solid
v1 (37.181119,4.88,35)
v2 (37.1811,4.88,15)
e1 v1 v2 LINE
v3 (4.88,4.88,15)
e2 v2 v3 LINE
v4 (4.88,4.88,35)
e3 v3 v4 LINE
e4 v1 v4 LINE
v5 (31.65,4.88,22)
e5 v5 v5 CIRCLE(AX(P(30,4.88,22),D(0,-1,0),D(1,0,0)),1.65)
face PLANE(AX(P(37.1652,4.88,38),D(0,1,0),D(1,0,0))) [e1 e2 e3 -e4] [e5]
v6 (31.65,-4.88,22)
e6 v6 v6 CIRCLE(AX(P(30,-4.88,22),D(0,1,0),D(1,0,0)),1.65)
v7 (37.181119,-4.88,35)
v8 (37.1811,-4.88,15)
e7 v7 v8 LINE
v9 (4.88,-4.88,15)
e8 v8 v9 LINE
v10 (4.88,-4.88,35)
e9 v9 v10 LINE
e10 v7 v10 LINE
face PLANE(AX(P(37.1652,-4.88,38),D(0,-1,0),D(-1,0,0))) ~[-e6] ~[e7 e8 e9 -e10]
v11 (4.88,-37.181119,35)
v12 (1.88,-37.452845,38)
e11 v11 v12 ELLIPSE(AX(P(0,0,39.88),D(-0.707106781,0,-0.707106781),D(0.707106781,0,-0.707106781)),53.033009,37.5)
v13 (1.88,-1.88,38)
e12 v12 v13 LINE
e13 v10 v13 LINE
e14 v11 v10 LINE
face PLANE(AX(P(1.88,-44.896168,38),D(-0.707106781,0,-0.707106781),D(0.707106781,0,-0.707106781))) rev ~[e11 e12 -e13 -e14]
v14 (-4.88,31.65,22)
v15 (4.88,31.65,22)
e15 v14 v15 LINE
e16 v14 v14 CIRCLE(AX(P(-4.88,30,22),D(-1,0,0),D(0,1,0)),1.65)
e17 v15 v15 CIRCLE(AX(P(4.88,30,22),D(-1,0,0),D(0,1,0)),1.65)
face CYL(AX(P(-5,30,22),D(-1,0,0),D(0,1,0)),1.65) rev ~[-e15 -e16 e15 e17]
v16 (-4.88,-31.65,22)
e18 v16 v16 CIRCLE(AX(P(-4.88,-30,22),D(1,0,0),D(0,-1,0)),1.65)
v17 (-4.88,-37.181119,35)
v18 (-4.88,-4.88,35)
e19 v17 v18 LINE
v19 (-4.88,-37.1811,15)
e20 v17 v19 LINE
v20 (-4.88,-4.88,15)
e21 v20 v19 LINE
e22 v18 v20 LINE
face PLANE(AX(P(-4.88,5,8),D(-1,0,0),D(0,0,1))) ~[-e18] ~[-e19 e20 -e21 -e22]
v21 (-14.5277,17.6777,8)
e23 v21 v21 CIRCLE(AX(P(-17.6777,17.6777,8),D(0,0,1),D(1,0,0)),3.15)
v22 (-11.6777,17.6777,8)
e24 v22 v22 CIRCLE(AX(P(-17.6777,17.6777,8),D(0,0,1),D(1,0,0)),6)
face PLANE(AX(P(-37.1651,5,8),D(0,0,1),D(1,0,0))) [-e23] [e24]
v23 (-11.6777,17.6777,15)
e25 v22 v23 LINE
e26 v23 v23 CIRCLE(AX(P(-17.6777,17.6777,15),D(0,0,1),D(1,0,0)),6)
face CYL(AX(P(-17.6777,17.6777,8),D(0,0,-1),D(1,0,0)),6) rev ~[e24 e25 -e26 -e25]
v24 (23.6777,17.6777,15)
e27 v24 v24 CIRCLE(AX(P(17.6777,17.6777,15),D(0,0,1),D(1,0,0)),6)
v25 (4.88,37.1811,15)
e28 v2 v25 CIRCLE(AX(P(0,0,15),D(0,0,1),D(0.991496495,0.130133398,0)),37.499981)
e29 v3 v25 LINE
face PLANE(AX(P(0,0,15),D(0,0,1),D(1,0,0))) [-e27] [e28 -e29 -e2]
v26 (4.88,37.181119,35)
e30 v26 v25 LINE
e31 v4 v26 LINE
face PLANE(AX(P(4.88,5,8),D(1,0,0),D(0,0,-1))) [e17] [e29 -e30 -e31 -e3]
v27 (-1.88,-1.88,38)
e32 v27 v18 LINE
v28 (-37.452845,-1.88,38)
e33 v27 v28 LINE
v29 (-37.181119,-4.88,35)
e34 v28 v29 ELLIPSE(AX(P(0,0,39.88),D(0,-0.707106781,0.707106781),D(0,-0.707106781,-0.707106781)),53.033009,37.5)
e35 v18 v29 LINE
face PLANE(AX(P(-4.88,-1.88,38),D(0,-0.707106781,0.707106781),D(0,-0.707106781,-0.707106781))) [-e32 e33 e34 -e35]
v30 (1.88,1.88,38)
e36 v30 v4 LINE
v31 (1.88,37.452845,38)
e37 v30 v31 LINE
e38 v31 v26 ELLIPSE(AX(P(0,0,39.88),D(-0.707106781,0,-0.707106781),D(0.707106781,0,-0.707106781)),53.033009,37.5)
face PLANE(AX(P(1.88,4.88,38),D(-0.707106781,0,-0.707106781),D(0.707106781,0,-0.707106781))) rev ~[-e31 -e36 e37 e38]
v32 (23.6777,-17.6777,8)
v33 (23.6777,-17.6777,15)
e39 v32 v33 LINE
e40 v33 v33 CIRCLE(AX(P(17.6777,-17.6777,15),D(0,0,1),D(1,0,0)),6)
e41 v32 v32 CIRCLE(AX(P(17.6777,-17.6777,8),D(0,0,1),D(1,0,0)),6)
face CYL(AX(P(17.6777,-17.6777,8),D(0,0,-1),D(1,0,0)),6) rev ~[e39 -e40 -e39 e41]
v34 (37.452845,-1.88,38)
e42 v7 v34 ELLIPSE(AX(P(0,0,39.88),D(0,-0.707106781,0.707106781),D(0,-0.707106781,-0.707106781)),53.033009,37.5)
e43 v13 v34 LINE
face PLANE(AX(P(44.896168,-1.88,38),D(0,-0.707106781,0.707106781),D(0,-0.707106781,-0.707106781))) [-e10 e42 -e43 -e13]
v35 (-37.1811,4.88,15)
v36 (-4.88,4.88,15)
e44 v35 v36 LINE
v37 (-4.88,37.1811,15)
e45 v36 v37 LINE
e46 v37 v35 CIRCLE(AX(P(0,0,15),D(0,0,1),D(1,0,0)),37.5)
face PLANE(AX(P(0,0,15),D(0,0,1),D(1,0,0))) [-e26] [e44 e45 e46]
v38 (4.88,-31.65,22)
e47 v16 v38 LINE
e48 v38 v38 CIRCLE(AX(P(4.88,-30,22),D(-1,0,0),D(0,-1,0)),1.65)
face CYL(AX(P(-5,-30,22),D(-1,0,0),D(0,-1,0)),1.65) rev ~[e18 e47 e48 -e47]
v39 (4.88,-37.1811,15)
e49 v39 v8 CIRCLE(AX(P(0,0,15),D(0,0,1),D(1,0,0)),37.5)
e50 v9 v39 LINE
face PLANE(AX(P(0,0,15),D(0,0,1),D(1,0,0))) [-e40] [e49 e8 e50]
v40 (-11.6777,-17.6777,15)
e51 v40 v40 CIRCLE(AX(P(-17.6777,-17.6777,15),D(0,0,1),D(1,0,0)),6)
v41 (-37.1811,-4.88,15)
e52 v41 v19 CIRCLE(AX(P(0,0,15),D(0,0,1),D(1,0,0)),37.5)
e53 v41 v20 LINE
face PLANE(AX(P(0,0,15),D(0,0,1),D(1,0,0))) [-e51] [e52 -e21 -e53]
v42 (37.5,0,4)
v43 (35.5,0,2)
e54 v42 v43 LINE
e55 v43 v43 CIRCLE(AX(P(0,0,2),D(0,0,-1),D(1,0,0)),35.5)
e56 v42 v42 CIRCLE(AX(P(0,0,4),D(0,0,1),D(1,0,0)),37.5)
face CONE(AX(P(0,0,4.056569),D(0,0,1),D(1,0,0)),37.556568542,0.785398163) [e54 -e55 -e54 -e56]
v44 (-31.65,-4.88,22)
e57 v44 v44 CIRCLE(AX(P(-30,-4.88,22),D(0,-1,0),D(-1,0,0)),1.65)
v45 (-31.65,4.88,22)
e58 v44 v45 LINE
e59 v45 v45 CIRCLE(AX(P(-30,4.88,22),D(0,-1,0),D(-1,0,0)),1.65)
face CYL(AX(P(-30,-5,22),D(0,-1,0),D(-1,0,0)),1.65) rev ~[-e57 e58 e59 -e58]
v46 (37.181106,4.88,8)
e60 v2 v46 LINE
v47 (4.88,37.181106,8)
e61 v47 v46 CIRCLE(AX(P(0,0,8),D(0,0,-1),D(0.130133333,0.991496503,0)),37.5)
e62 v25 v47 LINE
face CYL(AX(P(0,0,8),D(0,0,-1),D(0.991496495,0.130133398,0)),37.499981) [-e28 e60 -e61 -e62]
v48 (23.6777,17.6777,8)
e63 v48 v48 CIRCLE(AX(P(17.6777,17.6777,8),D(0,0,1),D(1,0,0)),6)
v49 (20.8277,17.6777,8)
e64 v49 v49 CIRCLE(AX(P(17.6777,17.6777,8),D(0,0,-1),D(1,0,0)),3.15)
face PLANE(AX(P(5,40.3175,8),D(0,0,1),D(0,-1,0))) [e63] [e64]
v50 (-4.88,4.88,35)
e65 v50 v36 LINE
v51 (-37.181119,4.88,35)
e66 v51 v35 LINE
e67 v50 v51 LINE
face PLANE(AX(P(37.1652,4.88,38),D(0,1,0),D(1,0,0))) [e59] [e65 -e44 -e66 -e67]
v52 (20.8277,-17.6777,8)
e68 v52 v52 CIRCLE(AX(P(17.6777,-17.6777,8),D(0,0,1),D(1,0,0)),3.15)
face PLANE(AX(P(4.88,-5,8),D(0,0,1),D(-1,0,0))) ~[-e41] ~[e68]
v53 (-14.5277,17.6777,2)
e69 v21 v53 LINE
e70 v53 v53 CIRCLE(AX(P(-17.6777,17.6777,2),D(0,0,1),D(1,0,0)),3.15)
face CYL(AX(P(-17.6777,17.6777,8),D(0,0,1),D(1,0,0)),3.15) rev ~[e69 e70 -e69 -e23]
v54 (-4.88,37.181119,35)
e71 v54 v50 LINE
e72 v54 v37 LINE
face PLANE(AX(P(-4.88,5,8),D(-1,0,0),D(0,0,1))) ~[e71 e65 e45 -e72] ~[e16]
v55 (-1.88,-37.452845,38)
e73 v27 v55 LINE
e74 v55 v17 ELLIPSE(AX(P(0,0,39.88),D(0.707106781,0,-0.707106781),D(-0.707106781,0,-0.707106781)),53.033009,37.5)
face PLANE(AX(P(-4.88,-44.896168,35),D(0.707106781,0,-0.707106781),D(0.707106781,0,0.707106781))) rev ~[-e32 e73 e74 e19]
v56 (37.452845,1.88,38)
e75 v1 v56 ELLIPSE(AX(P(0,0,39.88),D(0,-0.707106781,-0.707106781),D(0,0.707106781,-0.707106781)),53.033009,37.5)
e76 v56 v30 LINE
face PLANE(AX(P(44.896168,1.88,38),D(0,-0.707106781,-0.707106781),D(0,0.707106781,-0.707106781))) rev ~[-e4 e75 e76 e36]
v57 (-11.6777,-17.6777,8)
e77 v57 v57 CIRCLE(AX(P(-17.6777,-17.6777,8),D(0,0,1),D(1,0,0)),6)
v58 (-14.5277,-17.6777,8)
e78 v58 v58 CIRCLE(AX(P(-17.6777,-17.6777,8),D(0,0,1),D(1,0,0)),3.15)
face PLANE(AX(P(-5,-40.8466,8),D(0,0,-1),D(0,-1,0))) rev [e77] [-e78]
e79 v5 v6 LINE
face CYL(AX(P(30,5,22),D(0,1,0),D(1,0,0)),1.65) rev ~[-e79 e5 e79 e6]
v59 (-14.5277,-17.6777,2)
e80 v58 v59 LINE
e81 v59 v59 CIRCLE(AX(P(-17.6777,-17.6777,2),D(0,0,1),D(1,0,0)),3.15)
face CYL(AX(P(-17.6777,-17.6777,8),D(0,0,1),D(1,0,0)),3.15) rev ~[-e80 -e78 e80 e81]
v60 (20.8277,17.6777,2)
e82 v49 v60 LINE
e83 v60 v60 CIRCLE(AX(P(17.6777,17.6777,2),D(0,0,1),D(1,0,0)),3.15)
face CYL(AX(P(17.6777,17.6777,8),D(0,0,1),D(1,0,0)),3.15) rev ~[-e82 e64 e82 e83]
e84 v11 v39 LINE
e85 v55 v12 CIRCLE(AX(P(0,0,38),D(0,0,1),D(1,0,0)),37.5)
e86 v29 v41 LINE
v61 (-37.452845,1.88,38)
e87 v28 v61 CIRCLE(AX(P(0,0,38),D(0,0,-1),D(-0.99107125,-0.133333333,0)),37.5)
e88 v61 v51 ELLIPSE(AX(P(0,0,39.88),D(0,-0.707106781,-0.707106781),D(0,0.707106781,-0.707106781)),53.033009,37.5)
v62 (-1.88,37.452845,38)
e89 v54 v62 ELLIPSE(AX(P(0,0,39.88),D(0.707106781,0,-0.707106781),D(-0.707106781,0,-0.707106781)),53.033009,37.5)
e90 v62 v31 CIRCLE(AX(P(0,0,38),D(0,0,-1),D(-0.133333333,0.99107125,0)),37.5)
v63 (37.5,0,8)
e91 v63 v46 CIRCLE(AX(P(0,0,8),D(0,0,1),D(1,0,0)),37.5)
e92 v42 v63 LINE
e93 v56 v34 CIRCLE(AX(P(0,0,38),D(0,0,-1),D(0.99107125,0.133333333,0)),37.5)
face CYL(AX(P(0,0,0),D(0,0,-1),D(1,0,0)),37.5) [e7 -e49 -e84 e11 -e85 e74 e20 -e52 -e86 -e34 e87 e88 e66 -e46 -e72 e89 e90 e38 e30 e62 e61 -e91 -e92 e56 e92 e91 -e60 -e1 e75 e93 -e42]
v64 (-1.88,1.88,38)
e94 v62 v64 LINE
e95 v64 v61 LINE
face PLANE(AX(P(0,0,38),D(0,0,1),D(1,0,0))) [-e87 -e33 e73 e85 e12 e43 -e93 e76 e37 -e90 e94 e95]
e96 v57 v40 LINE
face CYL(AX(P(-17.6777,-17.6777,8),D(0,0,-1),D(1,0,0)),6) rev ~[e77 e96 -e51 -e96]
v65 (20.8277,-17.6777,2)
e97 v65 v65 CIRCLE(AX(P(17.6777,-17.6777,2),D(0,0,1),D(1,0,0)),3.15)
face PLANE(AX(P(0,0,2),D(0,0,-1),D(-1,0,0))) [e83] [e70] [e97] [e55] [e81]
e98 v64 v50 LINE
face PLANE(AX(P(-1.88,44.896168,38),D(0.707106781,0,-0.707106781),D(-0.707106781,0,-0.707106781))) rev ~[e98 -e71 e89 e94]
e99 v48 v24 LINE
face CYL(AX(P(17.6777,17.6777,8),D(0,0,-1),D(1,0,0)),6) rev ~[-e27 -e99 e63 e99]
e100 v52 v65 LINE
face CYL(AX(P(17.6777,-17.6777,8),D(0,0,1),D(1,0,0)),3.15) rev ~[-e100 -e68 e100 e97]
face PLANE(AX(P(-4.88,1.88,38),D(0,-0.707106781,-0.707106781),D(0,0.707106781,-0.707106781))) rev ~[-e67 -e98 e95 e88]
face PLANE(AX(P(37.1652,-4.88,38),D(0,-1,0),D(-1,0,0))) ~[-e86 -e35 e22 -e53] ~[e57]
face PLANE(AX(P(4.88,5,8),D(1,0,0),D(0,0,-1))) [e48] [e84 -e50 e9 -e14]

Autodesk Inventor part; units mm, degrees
ref_plane "YZ Plane" through (0, 0, 0) normal (1, 0, 0) x (0, 1, 0)
ref_plane "XZ Plane" through (0, 0, 0) normal (0, 1, 0) x (-1, 0, 0)
ref_plane "XY Plane" through (0, 0, 0) normal (0, 0, 1) x (1, 0, 0)
sketch "Sketch1" plane through (0, 0, 0) normal (0, 0, 1) x (1, 0, 0)
  circle A0 centre (0, 0) radius 37.5
  line L0 (0, 0) -> (0, -25)
  circle A1 centre (0, -25) radius 3
  dimension "d0" = 75
  dimension "d1" = 25
  dimension "d2" = 6
extrude "Extrusion1" add sketch "Sketch1" along normal blind 8 contours A0 | A1
sketch "Sketch2" plane through (0, 0, 8) normal (0, 0, 1) x (1, 0, 0)
  line L0 (0, 0) -> (17.6777, 17.6777)
  line L1 (0, 0) -> (25, 0) construction
  circle A0 centre (17.6777, 17.6777) radius 3.15
  circle A1 centre (-17.6777, 17.6777) radius 3.15
  circle A2 centre (-17.6777, -17.6777) radius 3.15
  circle A3 centre (17.6777, -17.6777) radius 3.15
  dimension "d5" = 25
  dimension "d6" = 45
  dimension "d7" = 6.3
  dimension "d10" = 360
extrude "Extrusion2" cut sketch "Sketch2" against normal blind 10
sketch "Sketch3" plane through (0, 0, 8) normal (0, 0, 1) x (1, 0, 0)
  arc A0 (-21.9203, 13.435) -> (-13.435, 21.9203) centre (-17.6777, 17.6777) ccw
  line L0 (-17.6777, 17.6777) -> (-11.6777, 17.6777) construction
  line L1 (-13.435, 21.9203) -> (-19.9189, 28.4042)
  line L2 (-21.9203, 13.435) -> (-28.4042, 19.9189)
  line L3 (-28.4042, 19.9189) -> (-19.9189, 28.4042)
  arc A1 (-13.435, -21.9203) -> (-21.9203, -13.435) centre (-17.6777, -17.6777) ccw
  line L4 (-17.6777, -17.6777) -> (-17.6777, -11.6777) construction
  line L5 (-21.9203, -13.435) -> (-28.4042, -19.9189)
  line L6 (-13.435, -21.9203) -> (-19.9189, -28.4042)
  line L7 (-19.9189, -28.4042) -> (-28.4042, -19.9189)
  arc A2 (21.9203, -13.435) -> (13.435, -21.9203) centre (17.6777, -17.6777) ccw
  line L8 (17.6777, -17.6777) -> (11.6777, -17.6777) construction
  line L9 (13.435, -21.9203) -> (19.9189, -28.4042)
  line L10 (21.9203, -13.435) -> (28.4042, -19.9189)
  line L11 (28.4042, -19.9189) -> (19.9189, -28.4042)
  arc A3 (13.435, 21.9203) -> (21.9203, 13.435) centre (17.6777, 17.6777) ccw
  line L12 (17.6777, 17.6777) -> (17.6777, 11.6777) construction
  line L13 (21.9203, 13.435) -> (28.4042, 19.9189)
  line L14 (13.435, 21.9203) -> (19.9189, 28.4042)
  line L15 (19.9189, 28.4042) -> (28.4042, 19.9189)
  circle A4 centre (0, 0) radius 31.5
  point P0 (-26.1087, 17.6234)
  point P1 (-26.1087, -17.6234)
  point P2 (-17.6234, -26.1087)
  point P3 (17.6234, -26.1087)
  point P4 (26.1087, -17.6234)
  point P5 (26.1087, 17.6234)
  point P6 (17.6234, 26.1087)
  point P7 (-17.6234, 26.1087)
  dimension "d14" = 12
  dimension "d18" = 360
sketch "Sketch4" plane through (0, 0, 0) normal (0, 0, -1) x (-1, 0, 0)
  circle A0 centre (0, 0) radius 42.8826
extrude "Extrusion4" cut sketch "Sketch4" against normal blind 2
sketch "Sketch5" plane through (0, 0, 8) normal (0, 0, 1) x (1, 0, 0)
  line L0 (0, 0) -> (8, 0)
  line L1 (8, 0) -> (8, -40)
  line L2 (8, -40) -> (-8, -40)
  line L3 (-8, -40) -> (-8, 40)
  line L4 (-8, 40) -> (8, 40)
  line L5 (8, 40) -> (8, -40)
  line L6 (0, 0) -> (0, 8)
  line L7 (0, 8) -> (40, 8)
  line L8 (40, 8) -> (40, -8)
  line L9 (40, -8) -> (-40, -8)
  line L10 (-40, -8) -> (-40, 8)
  line L11 (-40, 8) -> (40, 8)
  line L12 (0, 0) -> (0, 40)
  line L13 (0, 40) -> (-5, 40)
  line L14 (-5, 40) -> (5, 40)
  line L15 (5, 40) -> (5, -40)
  line L16 (5, -40) -> (-5, -40)
  line L17 (-5, -40) -> (-5, 40)
  point P0 (8, -8)
  point P1 (8, 8)
  point P2 (-8, 8)
  point P3 (-8, -8)
  dimension "d24" = 8
  dimension "d25" = 40
  dimension "d26" = 16
  dimension "d27" = 80
  dimension "d30" = 90
  dimension "d34" = 5
  dimension "d35" = 10
sketch "Sketch6" plane through (0, 0, 8) normal (0, 0, 1) x (1, 0, 0)
  line L0 (0, 0) -> (0, 40)
  line L1 (0, 40) -> (-5, 40)
  line L2 (-5, 40) -> (5, 40)
  line L3 (5, 40) -> (5, -40)
  line L4 (5, -40) -> (-5, -40)
  line L5 (-5, -40) -> (-5, 40)
  line L6 (0, 0) -> (-40, 0)
  line L7 (-40, 0) -> (-40, -5)
  line L8 (-40, -5) -> (-40, 5)
  line L9 (-40, 5) -> (40, 5)
  line L10 (40, 5) -> (40, -5)
  line L11 (40, -5) -> (-40, -5)
  circle A0 centre (0, 0) radius 37.5
  point P0 (5, -5)
  point P1 (5, 5)
  point P2 (-5, 5)
  point P3 (-5, -5)
  point P4 (37.1652, 5)
  point P5 (5, 37.1652)
  point P6 (-5, 37.1652)
  point P7 (-37.1652, 5)
  point P8 (-37.1652, -5)
  point P9 (-5, -37.1652)
  point P10 (5, -37.1652)
  point P11 (37.1652, -5)
  dimension "d36" = 40
  dimension "d37" = 5
  dimension "d38" = 10
  dimension "d39" = 80
  dimension "d42" = 90
  dimension "d46" = 75
extrude "Extrusion7" add sketch "Sketch6" along normal blind 30 contours L6 L5 L9 L0 | L0 L9 L3 L11 L5 L6 | L9 L5 A0 L0 | L0 A0 L3 L9 | L6 A0 L9 L5 | L5 L11 A0 L6 | L9 A0 L11 L3 | L11 L3 A0 L5
sketch "Sketch7" plane through (5, 5, 8) normal (0, 1, 0) x (1, 0, 0)
  line L0 (0, 0) -> (0, -30) projected
  line L1 (0, 0) -> (-5, 0)
  line L2 (-5, 0) -> (25, 0)
  line L3 (0, 0) -> (32.1652, 0) projected
  line L4 (25, 0) -> (25, -14)
  circle A0 centre (25, -14) radius 1.65
  point P0 (-5, 8)
  dimension "d49" = 5
  dimension "d50" = 30
  dimension "d51" = 14
  dimension "d52" = 3.3
extrude "Extrusion8" cut sketch "Sketch7" against normal blind 20
ref_plane "Work Plane1" through (5, 0, 8) normal (0, 1, 0) x (1, 0, 0)
ref_plane "Work Plane2" through (0, 5, 8) normal (1, 0, 0) x (0, 0, -1)
pattern_circular "Circular Pattern2" count 2 over 90 about axis through (0, 0, 8) along (0, 0, 1) of "Extrusion8"
sketch "Sketch8" plane through (-37.1652, 5, 8) normal (0, 1, 0) x (1, 0, 0)
  line L0 (32.1652, 0) -> (32.1652, -30) projected
  line L1 (32.1652, 0) -> (37.1652, 0)
  line L2 (37.1652, 0) -> (5.9902, 0)
  line L3 (22.6375, 0) -> (16.3375, 0) projected
  line L4 (5.9902, 0) -> (5.9902, -14)
  circle A0 centre (5.9902, -14) radius 2.15
  point P0 (37.1652, 8)
  dimension "d61" = 31.175
  dimension "d62" = 14
  dimension "d63" = 4.3
extrude "Extrusion9" [suppressed]
pattern_circular "Circular Pattern3" count 2 over 360 about axis through (0, 0, 8) along (0, 0, -1) of "Extrusion8"
chamfer "Chamfer1" distance 2 angle 45 1 edges at (-37.5, 0, 2)
sketch "Sketch10" plane through (5, 5, 8) normal (1, 0, 0) x (0, 0, -1)
  line L0 (0, 0) -> (-30, 0) projected
  line L1 (0, 0) -> (-30, 0)
  line L2 (-30, 0) -> (-30, 35.3175)
  line L3 (-30, 35.3175) -> (0, 35.3175)
  line L4 (0, 35.3175) -> (0, 0)
  line L5 (0, -10) -> (-30, -10) projected
  line L6 (0, -10) -> (-32.3439, -10)
  line L7 (-32.3439, -10) -> (-32.3439, -45.8466)
  line L8 (-32.3439, -45.8466) -> (0, -45.8466)
  line L9 (0, -45.8466) -> (0, -10)
  point P0 (8, -5)
extrude "Extrusion11" cut sketch "Sketch10" against normal blind 0.12
mirror "Mirror2" about plane through (0, 5, 8) normal (1, 0, 0) of "Extrusion11"
sketch "Sketch11" plane through (37.1652, 5, 38) normal (0, 1, 0) x (1, 0, 0)
  line L0 (-32.2852, 30) -> (-32.2852, 0) projected
  line L1 (-32.2852, 30) -> (5.1404, 30)
  line L2 (5.1404, 30) -> (5.1404, -1.2125)
  line L3 (5.1404, -1.2125) -> (-32.2852, -1.2125)
  line L4 (-32.2852, -1.2125) -> (-32.2852, 30)
  line L5 (-74.3303, 30) -> (-42.0452, 30) projected
  line L6 (-42.0452, 30) -> (-76.613, 30)
  line L7 (-76.613, 30) -> (-76.613, -1.2125)
  line L8 (-76.613, -1.2125) -> (-42.0452, -1.2125)
  line L9 (-42.0452, -1.2125) -> (-42.0452, 30)
  point P0 (-37.1652, 38)
extrude "Extrusion12" cut sketch "Sketch11" against normal blind 0.12
mirror "Mirror3" about plane through (5, 0, 8) normal (0, 1, 0) of "Extrusion12"
mirror "Mirror4" about plane through (5, 0, 8) normal (0, 1, 0) of "Extrusion8", "Circular Pattern2"
chamfer "Chamfer4" distance 3 angle 45 8 edges at (21.0306, 4.88, 38) (-21.0306, 4.88, 38) (4.88, -21.0306, 38) (4.88, 21.0306, 38) (-4.88, -21.0306, 38) (-4.88, 21.0306, 38) (21.0306, -4.88, 38) (-21.0306, -4.88, 38)
sketch "Sketch13" plane through (0, 0, 8) normal (0, 0, 1) x (1, 0, 0)
  arc A0 (37.1811, 4.88) -> (4.88, 37.1811) centre (0, 0) ccw projected
  circle A1 centre (0, 0) radius 37.5
  line L0 (37.1811, 4.88) -> (4.88, 4.88) projected
  line L1 (4.88, 4.88) -> (4.88, 37.1811) projected
  line L2 (37.1811, 4.88) -> (4.88, 4.88)
  line L3 (4.88, 4.88) -> (4.88, 37.1811)
  line L4 (4.88, 37.1811) -> (37.1811, 37.1811)
  line L5 (37.1811, 37.1811) -> (37.1811, 4.88)
  circle A2 centre (17.6777, 17.6777) radius 3.15 projected
  circle A3 centre (17.6777, 17.6777) radius 6
  line L6 (0, 0) -> (0, 7.2893)
  line L7 (0, 0) -> (7.7636, 0)
  arc A4 (-4.88, 37.1811) -> (-37.1811, 4.88) centre (0, 0) ccw
  circle A5 centre (0, 0) radius 37.5
  line L8 (-37.1811, 4.88) -> (-4.88, 4.88)
  line L9 (-4.88, 4.88) -> (-4.88, 37.1811)
  line L10 (-37.1811, 4.88) -> (-4.88, 4.88)
  line L11 (-4.88, 4.88) -> (-4.88, 37.1811)
  line L12 (-4.88, 37.1811) -> (-37.1811, 37.1811)
  line L13 (-37.1811, 37.1811) -> (-37.1811, 4.88)
  circle A6 centre (-17.6777, 17.6777) radius 3.15
  circle A7 centre (-17.6777, 17.6777) radius 6
  arc A8 (4.88, -37.1811) -> (37.1811, -4.88) centre (0, 0) ccw
  circle A9 centre (0, 0) radius 37.5
  line L14 (37.1811, -4.88) -> (4.88, -4.88)
  line L15 (4.88, -4.88) -> (4.88, -37.1811)
  line L16 (37.1811, -4.88) -> (4.88, -4.88)
  line L17 (4.88, -4.88) -> (4.88, -37.1811)
  line L18 (4.88, -37.1811) -> (37.1811, -37.1811)
  line L19 (37.1811, -37.1811) -> (37.1811, -4.88)
  circle A10 centre (17.6777, -17.6777) radius 3.15
  circle A11 centre (17.6777, -17.6777) radius 6
  line L20 (0, 0) -> (0, -7.2893)
  arc A12 (-37.1811, -4.88) -> (-4.88, -37.1811) centre (0, 0) ccw
  circle A13 centre (0, 0) radius 37.5
  line L21 (-37.1811, -4.88) -> (-4.88, -4.88)
  line L22 (-4.88, -4.88) -> (-4.88, -37.1811)
  line L23 (-37.1811, -4.88) -> (-4.88, -4.88)
  line L24 (-4.88, -4.88) -> (-4.88, -37.1811)
  line L25 (-4.88, -37.1811) -> (-37.1811, -37.1811)
  line L26 (-37.1811, -37.1811) -> (-37.1811, -4.88)
  circle A14 centre (-17.6777, -17.6777) radius 3.15
  circle A15 centre (-17.6777, -17.6777) radius 6
  arc A16 (1.88, 37.4528) -> (-1.88, 37.4528) centre (0, 0) ccw projected
  line L27 (1.88, 37.4528) -> (-1.88, 37.4528)
  line L28 (4.88, 37.1811) -> (17.88, 37.1811)
  line L29 (4.88, 37.1811) -> (4.88, 24.0161)
  point P0 (-37.1811, -4.88)
  dimension "d96" = 12
  dimension "d97" = 13
  dimension "d98" = 13.165
extrude "Extrusion14" add sketch "Sketch13" along normal blind 7 contours L0 L1 A0 | A1 L15 L14 | L9 L8 A1 | A1 L21 L22
properties part number "UR5_Mounting_Plate"
